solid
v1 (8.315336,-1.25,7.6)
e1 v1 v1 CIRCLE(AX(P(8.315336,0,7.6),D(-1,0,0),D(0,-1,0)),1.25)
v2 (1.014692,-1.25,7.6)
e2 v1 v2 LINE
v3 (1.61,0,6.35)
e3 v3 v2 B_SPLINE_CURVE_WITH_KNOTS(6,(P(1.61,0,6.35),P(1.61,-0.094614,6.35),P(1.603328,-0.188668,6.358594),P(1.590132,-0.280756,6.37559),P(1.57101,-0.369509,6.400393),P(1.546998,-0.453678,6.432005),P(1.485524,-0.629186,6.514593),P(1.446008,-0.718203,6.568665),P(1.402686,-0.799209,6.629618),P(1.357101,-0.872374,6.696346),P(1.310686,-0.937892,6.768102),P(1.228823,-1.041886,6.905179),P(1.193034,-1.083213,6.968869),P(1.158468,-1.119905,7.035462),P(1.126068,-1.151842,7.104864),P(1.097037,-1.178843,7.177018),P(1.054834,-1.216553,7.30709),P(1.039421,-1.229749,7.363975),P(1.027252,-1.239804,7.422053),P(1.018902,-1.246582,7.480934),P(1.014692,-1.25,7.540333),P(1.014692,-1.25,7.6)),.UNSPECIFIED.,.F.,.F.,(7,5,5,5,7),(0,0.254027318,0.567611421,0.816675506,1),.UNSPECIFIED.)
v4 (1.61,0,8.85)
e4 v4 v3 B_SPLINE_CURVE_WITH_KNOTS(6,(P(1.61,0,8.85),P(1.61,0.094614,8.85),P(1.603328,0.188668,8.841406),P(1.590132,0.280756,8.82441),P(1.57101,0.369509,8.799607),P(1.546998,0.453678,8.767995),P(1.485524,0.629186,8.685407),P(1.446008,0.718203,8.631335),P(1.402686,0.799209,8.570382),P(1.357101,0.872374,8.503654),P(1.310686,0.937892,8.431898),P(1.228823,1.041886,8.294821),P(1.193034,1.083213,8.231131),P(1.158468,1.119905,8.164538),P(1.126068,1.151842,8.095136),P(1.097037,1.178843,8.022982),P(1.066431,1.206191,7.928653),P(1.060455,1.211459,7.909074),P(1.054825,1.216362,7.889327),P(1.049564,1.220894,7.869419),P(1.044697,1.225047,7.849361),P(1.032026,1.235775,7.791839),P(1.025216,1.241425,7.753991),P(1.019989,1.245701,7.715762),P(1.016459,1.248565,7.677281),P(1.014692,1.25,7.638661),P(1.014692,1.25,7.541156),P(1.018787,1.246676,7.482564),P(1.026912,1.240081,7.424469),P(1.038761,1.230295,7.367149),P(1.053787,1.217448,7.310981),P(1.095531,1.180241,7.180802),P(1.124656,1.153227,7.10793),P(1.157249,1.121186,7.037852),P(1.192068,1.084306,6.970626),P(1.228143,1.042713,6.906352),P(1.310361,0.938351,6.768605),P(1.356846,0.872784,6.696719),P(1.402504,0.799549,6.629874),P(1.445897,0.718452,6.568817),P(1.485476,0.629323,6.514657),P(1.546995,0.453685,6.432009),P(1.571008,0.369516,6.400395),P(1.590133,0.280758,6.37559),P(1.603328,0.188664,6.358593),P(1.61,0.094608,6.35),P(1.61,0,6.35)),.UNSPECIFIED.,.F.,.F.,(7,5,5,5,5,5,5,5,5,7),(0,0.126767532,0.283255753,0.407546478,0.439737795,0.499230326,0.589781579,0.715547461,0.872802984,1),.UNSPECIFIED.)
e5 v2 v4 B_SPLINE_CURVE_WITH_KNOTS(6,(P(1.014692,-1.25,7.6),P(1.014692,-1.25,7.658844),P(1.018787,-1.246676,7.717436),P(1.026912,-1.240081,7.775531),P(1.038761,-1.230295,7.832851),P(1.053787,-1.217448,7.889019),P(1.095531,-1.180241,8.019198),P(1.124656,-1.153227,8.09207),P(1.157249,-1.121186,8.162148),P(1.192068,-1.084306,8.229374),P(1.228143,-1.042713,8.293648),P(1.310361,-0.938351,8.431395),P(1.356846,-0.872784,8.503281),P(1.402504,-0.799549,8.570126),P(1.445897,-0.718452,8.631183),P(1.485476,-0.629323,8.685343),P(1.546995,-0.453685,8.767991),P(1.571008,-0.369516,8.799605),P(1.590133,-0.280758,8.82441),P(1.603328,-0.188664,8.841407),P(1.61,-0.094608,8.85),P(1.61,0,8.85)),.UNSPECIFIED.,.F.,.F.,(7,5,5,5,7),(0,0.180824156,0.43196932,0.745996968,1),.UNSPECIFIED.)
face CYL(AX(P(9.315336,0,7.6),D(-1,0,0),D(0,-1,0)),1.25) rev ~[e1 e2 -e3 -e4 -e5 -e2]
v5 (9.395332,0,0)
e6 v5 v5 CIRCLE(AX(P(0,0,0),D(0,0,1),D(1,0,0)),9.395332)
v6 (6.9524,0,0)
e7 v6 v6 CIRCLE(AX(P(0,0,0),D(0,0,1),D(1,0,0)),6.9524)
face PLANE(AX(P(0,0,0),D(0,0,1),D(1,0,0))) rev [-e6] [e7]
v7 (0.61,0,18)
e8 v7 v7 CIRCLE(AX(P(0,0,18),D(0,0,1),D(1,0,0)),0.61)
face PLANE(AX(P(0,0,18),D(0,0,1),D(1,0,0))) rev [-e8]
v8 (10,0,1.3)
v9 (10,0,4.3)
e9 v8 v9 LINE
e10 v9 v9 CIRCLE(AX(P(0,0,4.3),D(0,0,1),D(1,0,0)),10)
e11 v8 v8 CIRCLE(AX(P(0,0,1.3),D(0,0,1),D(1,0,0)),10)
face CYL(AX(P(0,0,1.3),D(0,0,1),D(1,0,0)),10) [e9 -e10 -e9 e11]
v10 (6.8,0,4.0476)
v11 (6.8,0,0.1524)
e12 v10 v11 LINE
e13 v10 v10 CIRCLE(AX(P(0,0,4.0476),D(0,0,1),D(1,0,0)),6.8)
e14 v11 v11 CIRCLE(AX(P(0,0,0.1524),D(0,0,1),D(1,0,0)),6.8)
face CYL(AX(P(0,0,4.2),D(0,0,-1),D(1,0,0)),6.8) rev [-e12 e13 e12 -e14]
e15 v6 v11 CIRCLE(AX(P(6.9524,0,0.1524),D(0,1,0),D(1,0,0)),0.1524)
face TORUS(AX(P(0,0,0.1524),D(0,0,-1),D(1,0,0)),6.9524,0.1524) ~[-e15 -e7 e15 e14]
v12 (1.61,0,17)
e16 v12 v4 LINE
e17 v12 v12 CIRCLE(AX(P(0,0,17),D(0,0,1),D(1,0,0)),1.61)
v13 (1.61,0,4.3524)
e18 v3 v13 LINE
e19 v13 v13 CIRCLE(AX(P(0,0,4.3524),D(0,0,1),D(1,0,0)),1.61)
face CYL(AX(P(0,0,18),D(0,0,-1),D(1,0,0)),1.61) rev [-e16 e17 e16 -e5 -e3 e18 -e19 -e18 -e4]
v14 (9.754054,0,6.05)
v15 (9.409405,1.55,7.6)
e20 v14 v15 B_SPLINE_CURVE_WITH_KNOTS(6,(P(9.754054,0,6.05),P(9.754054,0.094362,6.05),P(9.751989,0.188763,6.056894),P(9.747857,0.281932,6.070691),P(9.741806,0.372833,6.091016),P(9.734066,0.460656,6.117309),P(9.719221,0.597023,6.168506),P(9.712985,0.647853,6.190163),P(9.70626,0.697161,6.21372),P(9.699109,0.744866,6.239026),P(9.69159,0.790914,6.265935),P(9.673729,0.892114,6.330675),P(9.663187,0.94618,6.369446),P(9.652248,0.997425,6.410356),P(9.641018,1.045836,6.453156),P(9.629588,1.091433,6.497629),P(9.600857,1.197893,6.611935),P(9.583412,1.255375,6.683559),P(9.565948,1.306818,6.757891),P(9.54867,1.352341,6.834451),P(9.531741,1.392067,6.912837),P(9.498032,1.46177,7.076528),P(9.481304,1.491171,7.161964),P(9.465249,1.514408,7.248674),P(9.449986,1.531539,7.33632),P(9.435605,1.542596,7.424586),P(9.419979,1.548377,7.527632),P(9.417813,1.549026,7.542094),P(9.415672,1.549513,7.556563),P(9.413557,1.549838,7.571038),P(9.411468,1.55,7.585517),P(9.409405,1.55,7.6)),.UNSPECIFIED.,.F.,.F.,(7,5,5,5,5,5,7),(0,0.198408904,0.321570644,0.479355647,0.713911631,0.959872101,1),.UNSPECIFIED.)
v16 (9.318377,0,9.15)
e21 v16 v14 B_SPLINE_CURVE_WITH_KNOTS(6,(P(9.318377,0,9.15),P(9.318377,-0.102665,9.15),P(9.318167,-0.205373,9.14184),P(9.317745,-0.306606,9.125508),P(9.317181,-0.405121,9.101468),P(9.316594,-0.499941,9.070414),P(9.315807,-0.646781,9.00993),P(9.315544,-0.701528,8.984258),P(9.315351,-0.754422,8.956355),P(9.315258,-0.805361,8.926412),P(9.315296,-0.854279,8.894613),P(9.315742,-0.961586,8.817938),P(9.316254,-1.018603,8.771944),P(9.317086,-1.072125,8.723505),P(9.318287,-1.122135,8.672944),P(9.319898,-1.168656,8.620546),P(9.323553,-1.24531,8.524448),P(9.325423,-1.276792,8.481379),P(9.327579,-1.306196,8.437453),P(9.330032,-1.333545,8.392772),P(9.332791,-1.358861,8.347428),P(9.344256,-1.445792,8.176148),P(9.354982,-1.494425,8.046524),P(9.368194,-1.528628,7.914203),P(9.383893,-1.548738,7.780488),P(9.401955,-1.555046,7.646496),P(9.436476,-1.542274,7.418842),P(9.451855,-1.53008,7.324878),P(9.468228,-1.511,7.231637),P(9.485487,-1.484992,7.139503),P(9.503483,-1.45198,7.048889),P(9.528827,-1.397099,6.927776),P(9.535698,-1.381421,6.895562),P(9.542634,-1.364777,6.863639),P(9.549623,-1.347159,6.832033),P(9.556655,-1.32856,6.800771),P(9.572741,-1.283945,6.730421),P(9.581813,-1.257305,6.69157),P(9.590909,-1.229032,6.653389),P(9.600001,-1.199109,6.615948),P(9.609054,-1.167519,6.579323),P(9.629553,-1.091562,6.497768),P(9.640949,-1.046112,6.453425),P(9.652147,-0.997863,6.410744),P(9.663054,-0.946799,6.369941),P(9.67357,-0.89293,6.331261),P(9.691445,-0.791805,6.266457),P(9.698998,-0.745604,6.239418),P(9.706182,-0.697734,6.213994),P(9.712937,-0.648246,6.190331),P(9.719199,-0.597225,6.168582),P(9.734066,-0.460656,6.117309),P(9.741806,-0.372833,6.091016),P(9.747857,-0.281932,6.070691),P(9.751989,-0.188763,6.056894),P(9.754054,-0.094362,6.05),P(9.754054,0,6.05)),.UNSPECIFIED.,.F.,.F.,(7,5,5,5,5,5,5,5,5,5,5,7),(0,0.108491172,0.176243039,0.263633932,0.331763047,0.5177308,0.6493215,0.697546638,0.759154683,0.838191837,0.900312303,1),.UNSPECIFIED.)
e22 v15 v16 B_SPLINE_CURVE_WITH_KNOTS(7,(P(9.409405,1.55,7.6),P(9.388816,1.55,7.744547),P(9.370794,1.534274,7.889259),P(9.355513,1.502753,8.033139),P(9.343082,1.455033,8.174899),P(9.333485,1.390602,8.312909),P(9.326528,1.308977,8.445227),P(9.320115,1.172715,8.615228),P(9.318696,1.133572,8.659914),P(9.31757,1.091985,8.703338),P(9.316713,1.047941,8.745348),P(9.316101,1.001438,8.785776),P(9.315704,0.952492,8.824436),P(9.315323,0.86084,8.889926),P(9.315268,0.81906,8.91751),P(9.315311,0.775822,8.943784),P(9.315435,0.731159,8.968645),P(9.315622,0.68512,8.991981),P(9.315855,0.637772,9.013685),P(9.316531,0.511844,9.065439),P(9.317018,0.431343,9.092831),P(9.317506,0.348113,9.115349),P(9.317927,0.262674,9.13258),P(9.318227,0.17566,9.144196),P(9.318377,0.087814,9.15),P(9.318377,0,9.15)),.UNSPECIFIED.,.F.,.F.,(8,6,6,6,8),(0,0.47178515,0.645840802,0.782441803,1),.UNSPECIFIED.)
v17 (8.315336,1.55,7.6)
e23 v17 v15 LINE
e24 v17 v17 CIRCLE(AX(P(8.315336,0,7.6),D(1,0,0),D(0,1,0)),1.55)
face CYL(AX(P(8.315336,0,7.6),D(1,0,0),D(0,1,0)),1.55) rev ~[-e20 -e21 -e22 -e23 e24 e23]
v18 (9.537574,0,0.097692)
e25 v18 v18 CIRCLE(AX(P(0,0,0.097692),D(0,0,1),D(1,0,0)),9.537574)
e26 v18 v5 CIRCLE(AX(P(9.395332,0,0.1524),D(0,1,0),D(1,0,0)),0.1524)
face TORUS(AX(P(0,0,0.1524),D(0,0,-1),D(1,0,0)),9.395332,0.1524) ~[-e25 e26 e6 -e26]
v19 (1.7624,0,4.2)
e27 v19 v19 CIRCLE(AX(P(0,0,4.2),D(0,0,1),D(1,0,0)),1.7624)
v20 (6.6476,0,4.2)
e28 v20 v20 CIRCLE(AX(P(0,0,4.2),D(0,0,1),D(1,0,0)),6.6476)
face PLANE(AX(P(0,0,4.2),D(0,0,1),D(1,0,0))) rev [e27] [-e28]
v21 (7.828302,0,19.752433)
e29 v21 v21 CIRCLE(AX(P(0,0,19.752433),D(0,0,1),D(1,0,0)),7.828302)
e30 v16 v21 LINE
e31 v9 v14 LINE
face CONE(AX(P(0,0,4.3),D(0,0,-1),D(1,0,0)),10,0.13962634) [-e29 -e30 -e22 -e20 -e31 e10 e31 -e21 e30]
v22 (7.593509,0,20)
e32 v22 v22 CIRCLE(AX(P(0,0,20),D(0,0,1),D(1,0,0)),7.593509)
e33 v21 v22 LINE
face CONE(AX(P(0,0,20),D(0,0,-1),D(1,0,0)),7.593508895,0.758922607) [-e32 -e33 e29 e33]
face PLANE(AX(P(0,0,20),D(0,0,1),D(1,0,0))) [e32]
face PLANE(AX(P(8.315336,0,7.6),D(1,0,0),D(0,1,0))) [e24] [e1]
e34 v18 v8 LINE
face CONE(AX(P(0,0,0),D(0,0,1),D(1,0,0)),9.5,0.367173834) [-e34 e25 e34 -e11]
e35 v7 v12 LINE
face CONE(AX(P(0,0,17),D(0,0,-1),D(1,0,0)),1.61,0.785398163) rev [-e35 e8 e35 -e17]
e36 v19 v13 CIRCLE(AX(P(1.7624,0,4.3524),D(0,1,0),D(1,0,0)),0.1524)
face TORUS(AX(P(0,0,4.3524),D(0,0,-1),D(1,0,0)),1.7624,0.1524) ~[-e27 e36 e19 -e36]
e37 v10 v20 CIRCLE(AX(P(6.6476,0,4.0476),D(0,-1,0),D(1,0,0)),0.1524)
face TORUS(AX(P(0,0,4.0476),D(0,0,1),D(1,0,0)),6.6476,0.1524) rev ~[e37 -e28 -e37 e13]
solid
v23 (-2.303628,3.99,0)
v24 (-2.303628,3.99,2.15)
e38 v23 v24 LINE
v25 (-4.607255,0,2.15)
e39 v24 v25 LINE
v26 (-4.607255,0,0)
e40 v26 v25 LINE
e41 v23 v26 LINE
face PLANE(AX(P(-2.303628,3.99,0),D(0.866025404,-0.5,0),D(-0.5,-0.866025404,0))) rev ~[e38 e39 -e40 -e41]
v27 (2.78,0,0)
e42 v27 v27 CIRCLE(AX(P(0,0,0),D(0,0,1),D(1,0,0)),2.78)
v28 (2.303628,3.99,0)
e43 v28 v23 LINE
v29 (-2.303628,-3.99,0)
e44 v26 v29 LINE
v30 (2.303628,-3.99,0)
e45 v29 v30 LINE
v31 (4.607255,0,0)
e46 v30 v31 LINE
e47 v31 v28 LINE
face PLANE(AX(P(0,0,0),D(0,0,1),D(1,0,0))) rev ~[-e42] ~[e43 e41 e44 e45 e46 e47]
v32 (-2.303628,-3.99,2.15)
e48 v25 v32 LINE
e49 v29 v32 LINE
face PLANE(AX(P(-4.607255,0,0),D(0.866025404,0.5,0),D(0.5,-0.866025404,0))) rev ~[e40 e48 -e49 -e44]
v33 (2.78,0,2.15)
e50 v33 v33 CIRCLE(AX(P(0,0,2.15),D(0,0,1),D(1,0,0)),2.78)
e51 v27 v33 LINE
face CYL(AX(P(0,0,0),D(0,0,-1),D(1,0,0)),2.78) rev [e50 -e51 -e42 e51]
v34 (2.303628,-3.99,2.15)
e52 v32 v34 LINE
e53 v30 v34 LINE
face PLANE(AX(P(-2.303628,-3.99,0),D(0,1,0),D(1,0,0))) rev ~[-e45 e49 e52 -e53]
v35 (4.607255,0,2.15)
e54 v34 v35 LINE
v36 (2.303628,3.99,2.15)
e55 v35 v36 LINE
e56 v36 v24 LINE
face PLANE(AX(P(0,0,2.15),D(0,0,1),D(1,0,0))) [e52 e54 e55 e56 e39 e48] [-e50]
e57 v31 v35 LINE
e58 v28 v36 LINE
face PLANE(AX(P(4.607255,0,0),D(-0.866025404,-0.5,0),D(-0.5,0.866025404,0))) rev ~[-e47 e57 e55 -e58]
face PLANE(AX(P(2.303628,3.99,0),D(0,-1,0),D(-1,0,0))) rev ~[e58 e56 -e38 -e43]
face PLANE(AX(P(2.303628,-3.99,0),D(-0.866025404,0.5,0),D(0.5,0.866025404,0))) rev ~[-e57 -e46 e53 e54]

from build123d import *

# Parameters (mm, degrees)
F3_SIZE        = 1
F4_SIZE2       = 0.2
F4_SIZE        = 0.25
F5_R           = 0.1524
F8_D           = 2.5
F8_DEPTH       = 10
F8_START       = 0.6846642
F8_CBORE_D     = 3.1
F8_CBORE_DEPTH = 1
F8_TIP         = 0.7510757738
F9_R           = 2.78
F10_DEPTH      = 2.15


with BuildPart() as f2:
    # F1 (on Front) → F2 (revolve)
    with BuildSketch(Plane.XZ):
        Polygon((6.8, 4.2), (6.8, 0), (9.5, 0), (10, 1.3), (10, 4.3), (7.7935088952, 20), (0, 20), (0, 18), (1.61, 18), (1.61, 4.2), align=None)
    revolve(axis=Axis((0, 0, 12.1), (0, 0, 1)))

    # F3
    f3_edges = [f2.edges().sort_by_distance(p)[0] for p in [
        (-1.61, 0, 18),
    ]]
    chamfer(f3_edges, length=F3_SIZE)

    # F4
    f4_edges = [f2.edges().sort_by_distance(p)[0] for p in [
        (-7.793509, 0, 20),
    ]]
    chamfer(f4_edges, length=F4_SIZE, length2=F4_SIZE2)

    # F5
    f5_edges = [f2.edges().sort_by_distance(p)[0] for p in [
        (-6.8, 0, 0),
        (-9.5, 0, 0),
        (-6.8, 0, 4.2),
        (-1.61, 0, 4.2),
    ]]
    fillet(f5_edges, radius=F5_R)

    # F8
    # its depths count from where the whole tool has entered the part; down to there all is cleared
    with Locations(Plane.YZ.offset(10).offset(-F8_START)):
        with Locations((0, 7.6)):
            CounterBoreHole(F8_D / 2, F8_CBORE_D / 2, F8_CBORE_DEPTH, depth=F8_DEPTH)
            with Locations((0, 0, -(F8_DEPTH + F8_TIP / 2))):  # 118° drill point
                Cone(0, F8_D / 2, F8_TIP, mode=Mode.SUBTRACT)


with BuildPart() as f10:
    # F9 (on Top) → F10 (new body)
    with BuildSketch(Plane.XY):
        Polygon((-2.3036275741, -3.99), (2.3036275741, -3.99), (4.6072551481, 0), (2.3036275741, 3.99), (-2.3036275741, 3.99), (-4.6072551481, 0), align=None)
        Circle(F9_R, mode=Mode.SUBTRACT)
    extrude(amount=F10_DEPTH)


solid = Compound([f2.part, f10.part])
